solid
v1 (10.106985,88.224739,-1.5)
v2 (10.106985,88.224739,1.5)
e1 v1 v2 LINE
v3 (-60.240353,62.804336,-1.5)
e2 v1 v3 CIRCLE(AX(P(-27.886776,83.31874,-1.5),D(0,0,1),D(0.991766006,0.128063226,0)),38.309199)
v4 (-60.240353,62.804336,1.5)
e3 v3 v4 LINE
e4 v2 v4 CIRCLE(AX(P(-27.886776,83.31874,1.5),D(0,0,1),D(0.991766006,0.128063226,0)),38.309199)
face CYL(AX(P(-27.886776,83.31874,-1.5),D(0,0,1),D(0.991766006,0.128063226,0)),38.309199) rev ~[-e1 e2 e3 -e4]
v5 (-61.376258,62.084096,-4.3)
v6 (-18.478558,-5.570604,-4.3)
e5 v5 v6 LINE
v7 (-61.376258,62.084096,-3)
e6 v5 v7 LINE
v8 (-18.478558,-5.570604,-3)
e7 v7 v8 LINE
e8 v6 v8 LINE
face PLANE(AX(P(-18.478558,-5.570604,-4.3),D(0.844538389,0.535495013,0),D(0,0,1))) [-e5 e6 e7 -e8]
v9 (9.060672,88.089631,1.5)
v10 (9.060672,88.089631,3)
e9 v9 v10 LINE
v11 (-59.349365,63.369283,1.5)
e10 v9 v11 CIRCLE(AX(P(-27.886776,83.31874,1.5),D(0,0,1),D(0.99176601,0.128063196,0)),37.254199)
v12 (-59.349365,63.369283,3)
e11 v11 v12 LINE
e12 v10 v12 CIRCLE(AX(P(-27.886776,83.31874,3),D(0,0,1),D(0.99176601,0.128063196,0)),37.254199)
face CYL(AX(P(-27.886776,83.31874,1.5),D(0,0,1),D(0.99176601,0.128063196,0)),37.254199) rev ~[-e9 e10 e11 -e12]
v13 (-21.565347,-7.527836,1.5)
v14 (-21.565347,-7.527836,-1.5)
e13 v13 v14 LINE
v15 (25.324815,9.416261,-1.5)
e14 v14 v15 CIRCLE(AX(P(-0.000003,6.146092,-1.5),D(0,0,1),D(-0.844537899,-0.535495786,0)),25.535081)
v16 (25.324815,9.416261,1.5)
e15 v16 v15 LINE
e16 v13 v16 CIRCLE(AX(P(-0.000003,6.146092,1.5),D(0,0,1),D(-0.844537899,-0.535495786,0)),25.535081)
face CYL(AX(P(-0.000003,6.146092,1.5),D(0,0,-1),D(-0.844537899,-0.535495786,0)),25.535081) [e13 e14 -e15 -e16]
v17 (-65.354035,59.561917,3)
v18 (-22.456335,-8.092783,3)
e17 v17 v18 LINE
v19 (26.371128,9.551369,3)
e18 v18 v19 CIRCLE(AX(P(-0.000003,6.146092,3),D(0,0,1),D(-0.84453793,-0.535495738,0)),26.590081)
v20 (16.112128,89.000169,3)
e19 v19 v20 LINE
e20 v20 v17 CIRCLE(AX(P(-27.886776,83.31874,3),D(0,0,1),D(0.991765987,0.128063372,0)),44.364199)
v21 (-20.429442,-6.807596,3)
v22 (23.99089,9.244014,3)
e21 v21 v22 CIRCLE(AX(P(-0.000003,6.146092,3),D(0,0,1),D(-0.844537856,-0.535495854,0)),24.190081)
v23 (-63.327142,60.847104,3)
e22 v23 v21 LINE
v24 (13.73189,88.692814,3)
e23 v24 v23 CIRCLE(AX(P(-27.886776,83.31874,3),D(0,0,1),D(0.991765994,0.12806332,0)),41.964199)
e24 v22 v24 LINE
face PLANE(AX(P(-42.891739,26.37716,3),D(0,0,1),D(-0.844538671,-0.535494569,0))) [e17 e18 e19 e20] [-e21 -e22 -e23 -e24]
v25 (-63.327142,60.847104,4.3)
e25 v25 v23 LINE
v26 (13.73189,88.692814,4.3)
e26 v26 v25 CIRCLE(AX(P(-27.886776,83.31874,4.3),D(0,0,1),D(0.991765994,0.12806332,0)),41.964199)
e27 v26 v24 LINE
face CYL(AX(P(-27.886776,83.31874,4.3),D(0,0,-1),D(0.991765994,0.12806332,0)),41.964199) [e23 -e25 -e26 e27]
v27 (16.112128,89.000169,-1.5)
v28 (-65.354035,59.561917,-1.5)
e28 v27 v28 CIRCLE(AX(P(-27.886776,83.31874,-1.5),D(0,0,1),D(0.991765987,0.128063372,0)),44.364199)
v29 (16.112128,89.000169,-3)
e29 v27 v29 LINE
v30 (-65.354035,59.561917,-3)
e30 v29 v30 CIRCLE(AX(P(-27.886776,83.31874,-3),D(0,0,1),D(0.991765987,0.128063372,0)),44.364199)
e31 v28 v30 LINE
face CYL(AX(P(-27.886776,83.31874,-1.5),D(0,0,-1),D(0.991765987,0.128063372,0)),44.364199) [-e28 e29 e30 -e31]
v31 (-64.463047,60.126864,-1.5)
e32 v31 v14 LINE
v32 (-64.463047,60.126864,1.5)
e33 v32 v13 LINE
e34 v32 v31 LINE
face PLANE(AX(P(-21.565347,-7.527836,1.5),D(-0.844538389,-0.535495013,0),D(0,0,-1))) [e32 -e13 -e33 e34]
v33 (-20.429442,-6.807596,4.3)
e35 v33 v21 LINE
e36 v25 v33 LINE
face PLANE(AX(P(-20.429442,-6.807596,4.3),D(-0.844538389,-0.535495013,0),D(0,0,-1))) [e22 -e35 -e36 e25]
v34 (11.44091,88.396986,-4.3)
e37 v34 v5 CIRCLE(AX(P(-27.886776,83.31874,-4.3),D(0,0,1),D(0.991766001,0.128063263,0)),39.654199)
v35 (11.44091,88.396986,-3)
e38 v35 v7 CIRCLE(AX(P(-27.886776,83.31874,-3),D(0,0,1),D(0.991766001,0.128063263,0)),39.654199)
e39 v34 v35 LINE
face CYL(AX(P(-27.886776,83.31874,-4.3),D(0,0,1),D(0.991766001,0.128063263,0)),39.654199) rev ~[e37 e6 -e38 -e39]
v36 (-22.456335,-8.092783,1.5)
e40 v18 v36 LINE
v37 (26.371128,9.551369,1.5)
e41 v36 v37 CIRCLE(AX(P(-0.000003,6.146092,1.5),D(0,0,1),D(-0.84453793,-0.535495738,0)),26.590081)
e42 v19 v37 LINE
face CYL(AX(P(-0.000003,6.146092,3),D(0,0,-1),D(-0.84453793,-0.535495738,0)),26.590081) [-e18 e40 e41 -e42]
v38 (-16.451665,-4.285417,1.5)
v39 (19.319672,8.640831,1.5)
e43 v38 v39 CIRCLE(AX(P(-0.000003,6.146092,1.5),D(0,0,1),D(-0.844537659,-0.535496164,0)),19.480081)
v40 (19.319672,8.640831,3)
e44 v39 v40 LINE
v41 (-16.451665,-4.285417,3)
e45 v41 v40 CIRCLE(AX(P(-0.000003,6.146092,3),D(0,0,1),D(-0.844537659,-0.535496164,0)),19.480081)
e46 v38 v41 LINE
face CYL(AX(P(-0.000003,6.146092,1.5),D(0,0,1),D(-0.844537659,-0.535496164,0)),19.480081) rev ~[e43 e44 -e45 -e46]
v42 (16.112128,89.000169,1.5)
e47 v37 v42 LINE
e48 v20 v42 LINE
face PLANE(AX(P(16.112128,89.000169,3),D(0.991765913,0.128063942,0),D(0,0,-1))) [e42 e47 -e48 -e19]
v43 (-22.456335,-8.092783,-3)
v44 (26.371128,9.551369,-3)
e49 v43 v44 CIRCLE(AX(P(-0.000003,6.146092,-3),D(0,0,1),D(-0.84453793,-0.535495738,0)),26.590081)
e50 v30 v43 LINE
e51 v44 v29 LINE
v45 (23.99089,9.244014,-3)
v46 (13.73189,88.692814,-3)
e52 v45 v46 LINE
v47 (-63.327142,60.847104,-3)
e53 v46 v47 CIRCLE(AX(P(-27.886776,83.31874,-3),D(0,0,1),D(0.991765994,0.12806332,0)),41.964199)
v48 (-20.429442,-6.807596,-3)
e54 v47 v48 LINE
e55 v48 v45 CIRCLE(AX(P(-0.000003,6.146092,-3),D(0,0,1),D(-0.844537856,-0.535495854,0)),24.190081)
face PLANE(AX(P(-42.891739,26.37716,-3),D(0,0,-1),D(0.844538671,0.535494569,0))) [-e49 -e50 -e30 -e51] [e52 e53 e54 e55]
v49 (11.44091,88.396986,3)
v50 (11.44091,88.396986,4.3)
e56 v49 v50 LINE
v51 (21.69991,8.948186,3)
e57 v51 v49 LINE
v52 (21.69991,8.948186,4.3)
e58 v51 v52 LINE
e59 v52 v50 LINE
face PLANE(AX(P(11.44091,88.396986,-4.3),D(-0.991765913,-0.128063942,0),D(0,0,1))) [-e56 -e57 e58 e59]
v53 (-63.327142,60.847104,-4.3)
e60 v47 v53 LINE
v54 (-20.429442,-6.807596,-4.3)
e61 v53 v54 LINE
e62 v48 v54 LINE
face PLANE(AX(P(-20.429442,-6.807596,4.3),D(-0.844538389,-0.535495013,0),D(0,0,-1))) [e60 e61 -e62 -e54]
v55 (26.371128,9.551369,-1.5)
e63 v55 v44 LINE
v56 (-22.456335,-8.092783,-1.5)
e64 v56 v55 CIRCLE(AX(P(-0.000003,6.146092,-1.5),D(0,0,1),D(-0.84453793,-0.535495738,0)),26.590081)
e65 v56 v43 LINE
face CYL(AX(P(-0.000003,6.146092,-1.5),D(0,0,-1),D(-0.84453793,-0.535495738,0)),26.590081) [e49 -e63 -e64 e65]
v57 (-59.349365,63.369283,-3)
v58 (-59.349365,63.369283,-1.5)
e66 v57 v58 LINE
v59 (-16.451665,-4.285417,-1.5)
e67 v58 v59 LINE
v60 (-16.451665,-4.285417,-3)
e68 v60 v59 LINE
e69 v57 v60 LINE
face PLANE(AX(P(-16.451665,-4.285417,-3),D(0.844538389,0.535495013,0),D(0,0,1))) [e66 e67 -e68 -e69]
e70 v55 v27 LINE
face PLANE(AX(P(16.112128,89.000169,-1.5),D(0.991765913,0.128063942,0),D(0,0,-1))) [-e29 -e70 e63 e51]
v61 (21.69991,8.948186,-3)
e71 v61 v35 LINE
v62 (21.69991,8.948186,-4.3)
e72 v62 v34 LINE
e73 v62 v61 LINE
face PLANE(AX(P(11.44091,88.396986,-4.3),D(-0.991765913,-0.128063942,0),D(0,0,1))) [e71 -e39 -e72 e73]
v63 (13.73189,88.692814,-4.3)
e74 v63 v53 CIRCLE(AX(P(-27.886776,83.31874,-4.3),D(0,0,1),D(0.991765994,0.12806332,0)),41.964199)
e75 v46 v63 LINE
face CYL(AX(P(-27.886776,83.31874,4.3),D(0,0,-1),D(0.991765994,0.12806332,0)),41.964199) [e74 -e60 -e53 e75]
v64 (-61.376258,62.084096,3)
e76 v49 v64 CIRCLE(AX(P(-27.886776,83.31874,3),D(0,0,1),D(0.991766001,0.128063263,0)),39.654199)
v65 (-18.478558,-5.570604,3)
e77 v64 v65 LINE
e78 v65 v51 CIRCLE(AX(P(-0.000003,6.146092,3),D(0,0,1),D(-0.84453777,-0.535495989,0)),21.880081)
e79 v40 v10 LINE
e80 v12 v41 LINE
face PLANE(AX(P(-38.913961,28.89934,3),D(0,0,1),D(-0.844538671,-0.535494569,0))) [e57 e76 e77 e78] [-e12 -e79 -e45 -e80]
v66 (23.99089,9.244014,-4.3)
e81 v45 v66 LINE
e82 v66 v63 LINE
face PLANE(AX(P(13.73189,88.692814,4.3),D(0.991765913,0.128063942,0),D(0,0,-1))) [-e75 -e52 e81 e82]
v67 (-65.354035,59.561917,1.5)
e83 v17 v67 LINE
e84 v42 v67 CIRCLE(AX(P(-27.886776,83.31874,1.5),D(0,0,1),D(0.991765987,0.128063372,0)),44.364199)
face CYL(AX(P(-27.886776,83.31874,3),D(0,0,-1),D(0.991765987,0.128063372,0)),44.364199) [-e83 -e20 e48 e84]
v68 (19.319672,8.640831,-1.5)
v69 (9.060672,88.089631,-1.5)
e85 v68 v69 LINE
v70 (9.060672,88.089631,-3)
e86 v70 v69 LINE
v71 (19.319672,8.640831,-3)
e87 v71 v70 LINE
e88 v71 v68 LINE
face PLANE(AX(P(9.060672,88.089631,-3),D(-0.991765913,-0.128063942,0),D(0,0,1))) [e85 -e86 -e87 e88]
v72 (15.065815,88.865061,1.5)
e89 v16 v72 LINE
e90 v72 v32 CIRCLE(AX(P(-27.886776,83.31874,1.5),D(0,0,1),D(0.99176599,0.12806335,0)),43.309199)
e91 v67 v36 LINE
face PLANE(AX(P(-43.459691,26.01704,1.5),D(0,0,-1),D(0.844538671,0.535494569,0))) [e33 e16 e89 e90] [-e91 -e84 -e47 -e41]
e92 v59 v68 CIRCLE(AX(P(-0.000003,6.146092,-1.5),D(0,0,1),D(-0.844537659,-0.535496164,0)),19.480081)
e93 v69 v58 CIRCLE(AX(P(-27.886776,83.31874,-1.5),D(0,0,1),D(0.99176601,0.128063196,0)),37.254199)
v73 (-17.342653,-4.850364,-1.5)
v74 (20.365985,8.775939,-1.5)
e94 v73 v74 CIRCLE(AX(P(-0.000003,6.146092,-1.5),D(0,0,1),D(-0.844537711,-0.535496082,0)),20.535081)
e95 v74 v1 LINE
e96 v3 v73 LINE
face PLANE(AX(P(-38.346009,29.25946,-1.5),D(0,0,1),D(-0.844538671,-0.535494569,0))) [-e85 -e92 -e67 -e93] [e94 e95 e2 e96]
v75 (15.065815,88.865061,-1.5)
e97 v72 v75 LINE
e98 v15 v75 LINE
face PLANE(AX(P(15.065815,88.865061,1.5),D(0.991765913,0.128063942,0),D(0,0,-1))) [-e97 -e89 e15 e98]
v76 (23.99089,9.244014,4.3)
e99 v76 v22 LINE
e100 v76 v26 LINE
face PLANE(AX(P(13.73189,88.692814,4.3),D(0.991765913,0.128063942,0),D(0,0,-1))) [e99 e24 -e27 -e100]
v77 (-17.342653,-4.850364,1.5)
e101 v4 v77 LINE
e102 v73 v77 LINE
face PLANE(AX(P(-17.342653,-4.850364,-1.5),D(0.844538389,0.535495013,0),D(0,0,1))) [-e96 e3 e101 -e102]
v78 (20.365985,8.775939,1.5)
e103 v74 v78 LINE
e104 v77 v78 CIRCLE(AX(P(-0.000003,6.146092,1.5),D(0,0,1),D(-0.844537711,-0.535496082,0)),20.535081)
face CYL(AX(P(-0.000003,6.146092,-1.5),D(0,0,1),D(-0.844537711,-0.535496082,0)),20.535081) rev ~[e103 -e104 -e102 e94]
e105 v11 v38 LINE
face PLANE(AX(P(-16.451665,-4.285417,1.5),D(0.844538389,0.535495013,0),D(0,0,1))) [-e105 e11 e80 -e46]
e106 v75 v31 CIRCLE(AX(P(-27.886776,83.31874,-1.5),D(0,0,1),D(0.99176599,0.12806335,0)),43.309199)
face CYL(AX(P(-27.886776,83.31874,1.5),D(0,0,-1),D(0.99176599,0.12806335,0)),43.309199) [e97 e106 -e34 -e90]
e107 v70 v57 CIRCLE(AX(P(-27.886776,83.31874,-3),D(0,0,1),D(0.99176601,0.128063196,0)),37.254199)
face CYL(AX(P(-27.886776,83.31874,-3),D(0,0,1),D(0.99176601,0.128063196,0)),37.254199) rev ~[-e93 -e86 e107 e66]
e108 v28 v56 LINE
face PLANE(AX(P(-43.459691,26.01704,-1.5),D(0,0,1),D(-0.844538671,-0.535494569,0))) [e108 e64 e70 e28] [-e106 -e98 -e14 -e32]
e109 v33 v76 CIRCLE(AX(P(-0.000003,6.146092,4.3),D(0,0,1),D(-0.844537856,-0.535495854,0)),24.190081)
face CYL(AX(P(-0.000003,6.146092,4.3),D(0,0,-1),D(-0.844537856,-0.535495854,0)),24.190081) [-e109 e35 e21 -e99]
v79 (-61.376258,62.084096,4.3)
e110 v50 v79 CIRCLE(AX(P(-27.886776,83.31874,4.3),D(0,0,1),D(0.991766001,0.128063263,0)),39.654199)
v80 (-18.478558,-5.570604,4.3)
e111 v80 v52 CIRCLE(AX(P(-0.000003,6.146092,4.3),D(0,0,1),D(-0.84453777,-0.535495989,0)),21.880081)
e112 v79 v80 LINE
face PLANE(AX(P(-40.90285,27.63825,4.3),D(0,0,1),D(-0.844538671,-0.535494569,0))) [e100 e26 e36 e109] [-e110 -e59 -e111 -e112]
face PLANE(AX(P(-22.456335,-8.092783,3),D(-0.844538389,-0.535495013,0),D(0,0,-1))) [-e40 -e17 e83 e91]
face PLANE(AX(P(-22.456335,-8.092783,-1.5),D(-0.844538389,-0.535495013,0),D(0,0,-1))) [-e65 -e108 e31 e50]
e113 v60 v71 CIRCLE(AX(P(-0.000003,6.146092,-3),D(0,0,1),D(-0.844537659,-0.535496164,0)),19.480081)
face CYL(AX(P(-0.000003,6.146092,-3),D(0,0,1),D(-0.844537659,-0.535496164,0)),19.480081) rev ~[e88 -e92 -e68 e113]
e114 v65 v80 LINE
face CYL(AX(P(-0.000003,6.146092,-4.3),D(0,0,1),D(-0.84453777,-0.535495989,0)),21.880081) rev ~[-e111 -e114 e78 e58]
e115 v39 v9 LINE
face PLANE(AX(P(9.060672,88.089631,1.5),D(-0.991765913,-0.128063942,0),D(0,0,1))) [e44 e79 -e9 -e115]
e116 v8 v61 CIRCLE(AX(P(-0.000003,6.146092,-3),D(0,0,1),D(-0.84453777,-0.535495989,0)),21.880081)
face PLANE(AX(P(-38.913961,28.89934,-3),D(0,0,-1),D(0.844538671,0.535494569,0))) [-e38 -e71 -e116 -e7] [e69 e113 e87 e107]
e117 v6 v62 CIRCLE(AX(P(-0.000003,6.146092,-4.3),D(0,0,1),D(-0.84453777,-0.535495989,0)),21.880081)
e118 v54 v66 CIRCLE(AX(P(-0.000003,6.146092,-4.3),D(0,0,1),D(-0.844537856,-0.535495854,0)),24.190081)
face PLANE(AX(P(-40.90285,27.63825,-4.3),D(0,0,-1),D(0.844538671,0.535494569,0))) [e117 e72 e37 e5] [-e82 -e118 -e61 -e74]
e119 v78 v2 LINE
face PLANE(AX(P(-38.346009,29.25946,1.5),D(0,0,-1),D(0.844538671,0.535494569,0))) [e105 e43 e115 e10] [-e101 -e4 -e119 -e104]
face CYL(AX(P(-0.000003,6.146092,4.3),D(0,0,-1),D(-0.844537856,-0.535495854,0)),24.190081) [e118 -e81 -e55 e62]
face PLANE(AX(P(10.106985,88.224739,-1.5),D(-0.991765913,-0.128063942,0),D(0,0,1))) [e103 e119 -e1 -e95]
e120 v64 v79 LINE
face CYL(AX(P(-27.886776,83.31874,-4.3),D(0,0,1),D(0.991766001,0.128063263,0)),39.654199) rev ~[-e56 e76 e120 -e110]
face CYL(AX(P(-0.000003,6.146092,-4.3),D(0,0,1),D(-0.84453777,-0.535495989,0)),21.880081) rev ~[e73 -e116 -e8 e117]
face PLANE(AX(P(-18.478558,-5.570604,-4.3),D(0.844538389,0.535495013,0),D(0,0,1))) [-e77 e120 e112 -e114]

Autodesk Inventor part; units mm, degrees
ref_plane "Work Plane2" through (0, 6.1461, 0) normal (-1, 0, 0) x (0, 0, 1)
ref_plane "Work Plane3" through (-27.8868, 83.3187, 0) normal (0.5179064, -0.8554373, 0) x (0, 0, 1)
sketch "Path" plane through (0, 0, 0) normal (0, 0, 1) x (1, 0, 0)
  arc A0 (-19.454, -6.1891) -> (22.8454, 9.0961) centre (0, 6.1461) ccw
  arc A1 (12.5864, 88.5449) -> (-62.3517, 61.4656) centre (-27.8868, 83.3187) ccw
  line L0 (12.5864, 88.5449) -> (22.8454, 9.0961)
  line L1 (-19.454, -6.1891) -> (-62.3517, 61.4656)
  dimension "d31" = 7.11
ref_plane "Section Plane" through (22.8454, 9.0961, 0) normal (-0.1280643, 0.9917659, 0) x (0, 0, 1)
sketch "Section Sketch" plane through (22.8454, 9.0961, 0) normal (-0.1280643, 0.9917659, 0) x (0, 0, 1)
  line L0 (-4.3, -1.155) -> (4.3, -1.155)
  line L1 (4.3, -1.155) -> (4.3, 1.155)
  line L2 (4.3, 1.155) -> (-4.3, 1.155)
  line L3 (-4.3, 1.155) -> (-4.3, -1.155)
  line L4 (-1.5, -2.5) -> (1.5, -2.5)
  line L5 (1.5, -2.5) -> (1.5, 2.5)
  line L6 (1.5, 2.5) -> (-1.5, 2.5)
  line L7 (-1.5, 2.5) -> (-1.5, -2.5)
  line L8 (-1.5, 0) -> (1.5, 0) construction
  line L9 (-3, -3.555) -> (-1.5, -3.555)
  line L10 (-1.5, -3.555) -> (-1.5, 3.555)
  line L11 (-1.5, 3.555) -> (-3, 3.555)
  line L12 (-3, 3.555) -> (-3, -3.555)
  line L13 (1.5, -3.555) -> (3, -3.555)
  line L14 (3, -3.555) -> (3, 3.555)
  line L15 (3, 3.555) -> (1.5, 3.555)
  line L16 (1.5, 3.555) -> (1.5, -3.555)
  line L17 (-4.3, 0) -> (4.3, 0) construction
  point P0 (0, 0)
  point P1 (0, 0)
  dimension "d21" = 2.31
  dimension "d22" = 5
  dimension "d23" = 3
  dimension "d24" = 1.5
  dimension "d31" = 7.11
  dimension "d32" = 8.6
sweep "Solid" add profiles "Section Sketch" path "Path"
pattern_of_one "Strand Pattern"
equation "\"d21\" = da_d2"
equation "\"d22\" = da_d1"
equation "\"d23\" = da_b1"
equation "\"d24\" = da_t1 + da_t2"
equation "\"d30\" = da_pt"
equation "\"da_p\" = 8"
equation "\"da_b1\" = 3"
equation "\"da_h2\" = 7.11"
equation "\"da_h3\" = 7.11"
equation "\"da_d1\" = 5"
equation "\"da_d2\" = 2.31"
equation "\"da_pt\" = 5.64"
equation "\"da_b\" = 8.6"
equation "\"da_t1\" = 0.75"
equation "\"da_t2\" = 0.75"
properties part number "Roller Chain"
